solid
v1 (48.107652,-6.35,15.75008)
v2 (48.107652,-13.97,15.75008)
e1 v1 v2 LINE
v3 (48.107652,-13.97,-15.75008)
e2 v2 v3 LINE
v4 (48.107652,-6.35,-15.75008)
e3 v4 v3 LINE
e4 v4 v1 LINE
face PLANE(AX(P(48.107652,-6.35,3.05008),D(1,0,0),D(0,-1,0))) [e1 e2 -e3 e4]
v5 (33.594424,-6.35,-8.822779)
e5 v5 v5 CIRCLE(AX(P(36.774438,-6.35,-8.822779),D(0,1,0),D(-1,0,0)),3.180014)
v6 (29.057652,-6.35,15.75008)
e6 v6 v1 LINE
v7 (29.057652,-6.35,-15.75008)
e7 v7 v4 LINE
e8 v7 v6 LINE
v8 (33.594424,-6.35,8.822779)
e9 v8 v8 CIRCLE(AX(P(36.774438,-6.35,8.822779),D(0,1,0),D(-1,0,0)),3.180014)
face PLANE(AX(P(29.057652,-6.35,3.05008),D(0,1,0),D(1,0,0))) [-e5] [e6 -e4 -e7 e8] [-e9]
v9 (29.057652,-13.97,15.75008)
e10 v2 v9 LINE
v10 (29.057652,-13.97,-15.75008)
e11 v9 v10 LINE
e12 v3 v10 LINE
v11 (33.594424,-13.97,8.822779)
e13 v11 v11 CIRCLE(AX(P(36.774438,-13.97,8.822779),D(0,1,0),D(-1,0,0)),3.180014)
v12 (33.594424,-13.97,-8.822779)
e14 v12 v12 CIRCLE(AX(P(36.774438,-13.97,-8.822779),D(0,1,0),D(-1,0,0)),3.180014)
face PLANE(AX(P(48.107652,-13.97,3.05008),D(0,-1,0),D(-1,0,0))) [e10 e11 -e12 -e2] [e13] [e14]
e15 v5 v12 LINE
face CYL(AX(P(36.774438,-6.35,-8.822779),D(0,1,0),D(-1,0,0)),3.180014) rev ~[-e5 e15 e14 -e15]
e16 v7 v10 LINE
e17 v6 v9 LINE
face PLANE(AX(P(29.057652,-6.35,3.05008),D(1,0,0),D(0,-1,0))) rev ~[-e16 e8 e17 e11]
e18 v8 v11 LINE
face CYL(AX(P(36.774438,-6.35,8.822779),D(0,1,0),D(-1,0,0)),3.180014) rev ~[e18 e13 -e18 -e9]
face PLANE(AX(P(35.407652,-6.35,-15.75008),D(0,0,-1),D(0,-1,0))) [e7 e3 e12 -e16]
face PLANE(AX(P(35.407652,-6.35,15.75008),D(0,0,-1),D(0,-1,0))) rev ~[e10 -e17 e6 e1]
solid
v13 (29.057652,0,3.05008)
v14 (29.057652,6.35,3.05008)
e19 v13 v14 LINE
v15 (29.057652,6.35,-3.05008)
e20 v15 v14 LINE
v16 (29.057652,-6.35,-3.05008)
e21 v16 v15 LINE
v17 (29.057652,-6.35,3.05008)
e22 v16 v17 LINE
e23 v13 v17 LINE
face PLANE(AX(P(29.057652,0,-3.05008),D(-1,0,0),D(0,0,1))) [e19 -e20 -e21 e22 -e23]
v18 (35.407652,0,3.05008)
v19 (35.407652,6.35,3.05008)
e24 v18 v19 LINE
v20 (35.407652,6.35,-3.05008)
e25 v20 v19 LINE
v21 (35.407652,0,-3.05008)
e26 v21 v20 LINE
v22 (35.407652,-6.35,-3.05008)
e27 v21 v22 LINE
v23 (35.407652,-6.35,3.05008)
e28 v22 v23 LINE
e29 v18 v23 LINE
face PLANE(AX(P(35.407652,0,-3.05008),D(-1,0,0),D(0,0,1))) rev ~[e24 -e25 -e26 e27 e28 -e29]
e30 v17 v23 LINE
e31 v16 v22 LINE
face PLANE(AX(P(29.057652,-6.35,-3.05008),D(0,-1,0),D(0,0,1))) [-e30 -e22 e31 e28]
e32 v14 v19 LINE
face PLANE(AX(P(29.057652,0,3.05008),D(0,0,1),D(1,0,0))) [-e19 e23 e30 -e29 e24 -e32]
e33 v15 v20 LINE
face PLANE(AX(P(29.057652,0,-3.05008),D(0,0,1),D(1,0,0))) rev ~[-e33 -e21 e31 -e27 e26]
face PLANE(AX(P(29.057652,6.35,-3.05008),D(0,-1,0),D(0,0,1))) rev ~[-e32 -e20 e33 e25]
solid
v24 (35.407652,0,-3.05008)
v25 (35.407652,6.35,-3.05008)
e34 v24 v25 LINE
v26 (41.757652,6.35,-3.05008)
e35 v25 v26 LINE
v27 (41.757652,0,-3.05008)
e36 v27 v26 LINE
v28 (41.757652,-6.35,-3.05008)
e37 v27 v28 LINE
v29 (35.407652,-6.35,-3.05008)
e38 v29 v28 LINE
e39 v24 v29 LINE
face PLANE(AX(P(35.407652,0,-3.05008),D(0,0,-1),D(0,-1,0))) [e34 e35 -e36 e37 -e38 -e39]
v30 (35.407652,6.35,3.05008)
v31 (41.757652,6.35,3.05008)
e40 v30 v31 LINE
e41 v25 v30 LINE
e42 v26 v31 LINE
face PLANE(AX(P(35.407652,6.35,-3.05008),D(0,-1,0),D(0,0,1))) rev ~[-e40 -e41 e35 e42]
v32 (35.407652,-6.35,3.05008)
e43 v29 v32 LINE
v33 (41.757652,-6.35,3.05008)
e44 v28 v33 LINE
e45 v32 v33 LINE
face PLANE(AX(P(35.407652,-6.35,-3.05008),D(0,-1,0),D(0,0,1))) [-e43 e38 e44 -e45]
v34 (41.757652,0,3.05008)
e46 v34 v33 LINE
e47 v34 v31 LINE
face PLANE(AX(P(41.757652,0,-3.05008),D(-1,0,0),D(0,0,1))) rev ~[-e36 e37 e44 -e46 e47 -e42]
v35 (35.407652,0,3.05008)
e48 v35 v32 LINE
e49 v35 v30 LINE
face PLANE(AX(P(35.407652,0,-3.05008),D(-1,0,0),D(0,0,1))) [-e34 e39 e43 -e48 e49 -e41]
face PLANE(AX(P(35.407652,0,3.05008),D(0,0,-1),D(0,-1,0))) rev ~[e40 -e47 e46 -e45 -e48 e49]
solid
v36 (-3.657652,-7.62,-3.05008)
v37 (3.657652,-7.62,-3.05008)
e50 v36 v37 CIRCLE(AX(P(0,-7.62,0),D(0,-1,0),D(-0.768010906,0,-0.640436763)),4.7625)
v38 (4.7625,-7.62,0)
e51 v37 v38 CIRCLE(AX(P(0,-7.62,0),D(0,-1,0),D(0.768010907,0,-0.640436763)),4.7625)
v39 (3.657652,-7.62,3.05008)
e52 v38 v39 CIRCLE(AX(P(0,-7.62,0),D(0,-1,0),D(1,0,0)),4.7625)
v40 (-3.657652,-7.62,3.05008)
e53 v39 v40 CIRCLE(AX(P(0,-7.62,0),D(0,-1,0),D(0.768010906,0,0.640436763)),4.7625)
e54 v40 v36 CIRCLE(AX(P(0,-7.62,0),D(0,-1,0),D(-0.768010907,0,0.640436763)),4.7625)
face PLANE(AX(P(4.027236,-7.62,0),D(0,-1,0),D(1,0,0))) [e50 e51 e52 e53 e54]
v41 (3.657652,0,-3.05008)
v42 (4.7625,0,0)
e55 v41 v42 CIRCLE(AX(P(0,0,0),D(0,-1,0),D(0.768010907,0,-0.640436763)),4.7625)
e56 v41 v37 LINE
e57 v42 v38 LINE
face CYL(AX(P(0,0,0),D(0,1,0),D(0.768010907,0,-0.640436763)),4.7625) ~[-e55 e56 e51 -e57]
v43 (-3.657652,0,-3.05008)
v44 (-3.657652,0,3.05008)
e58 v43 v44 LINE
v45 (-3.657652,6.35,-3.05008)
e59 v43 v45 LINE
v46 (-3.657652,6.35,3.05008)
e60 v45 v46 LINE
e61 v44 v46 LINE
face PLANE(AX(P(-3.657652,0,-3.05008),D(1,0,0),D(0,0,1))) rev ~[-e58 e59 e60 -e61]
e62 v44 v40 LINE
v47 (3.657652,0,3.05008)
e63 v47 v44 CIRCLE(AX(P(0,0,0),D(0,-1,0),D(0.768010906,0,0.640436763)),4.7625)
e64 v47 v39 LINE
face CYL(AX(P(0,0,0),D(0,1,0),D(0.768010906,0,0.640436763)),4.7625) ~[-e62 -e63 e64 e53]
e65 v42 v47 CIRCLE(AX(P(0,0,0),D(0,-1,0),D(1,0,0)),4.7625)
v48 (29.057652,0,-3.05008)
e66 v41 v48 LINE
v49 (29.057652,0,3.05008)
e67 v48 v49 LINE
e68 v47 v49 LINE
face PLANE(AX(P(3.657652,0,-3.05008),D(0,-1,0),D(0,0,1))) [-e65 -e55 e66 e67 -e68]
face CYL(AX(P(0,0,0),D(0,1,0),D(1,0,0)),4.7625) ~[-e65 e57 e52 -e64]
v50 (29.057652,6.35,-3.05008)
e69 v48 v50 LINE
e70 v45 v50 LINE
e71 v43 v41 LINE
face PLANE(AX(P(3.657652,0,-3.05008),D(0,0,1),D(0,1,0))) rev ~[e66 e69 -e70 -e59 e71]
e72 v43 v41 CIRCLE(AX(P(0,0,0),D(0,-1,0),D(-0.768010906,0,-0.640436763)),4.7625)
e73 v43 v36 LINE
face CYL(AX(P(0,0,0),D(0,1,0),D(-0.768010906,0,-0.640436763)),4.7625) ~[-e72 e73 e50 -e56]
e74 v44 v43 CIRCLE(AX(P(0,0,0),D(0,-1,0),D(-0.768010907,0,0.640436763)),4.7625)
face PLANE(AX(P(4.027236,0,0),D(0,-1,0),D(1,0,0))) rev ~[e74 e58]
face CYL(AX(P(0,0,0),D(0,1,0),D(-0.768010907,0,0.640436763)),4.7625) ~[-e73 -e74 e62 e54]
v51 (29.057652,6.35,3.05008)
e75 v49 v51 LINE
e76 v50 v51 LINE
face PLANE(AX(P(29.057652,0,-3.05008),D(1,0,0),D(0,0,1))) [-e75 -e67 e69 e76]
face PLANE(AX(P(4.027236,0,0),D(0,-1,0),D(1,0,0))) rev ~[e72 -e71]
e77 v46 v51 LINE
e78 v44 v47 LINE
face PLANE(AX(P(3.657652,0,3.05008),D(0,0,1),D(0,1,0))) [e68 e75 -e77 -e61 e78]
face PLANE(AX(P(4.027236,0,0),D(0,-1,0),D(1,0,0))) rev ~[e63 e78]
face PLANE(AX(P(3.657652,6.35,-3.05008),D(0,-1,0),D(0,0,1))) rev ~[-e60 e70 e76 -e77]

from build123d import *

# Parameters (mm, degrees)
F0_W      = 7.3153038846
F0_H      = 6.1001601681
F1_DEPTH  = 7.62
F2_DEPTH  = 6.35
F3_DEPTH  = 25.4
F4_DEPTH  = 6.35
F5_DEPTH  = 6.35
F6_DEPTH  = 7.62
F7_DEPTH  = 12.7
F8_DEPTH  = 12.7
F9_DEPTH  = 12.7
F10_DEPTH = 6.35
F11_R     = 3.1800137538
F12_DEPTH = 25.4


with BuildPart() as f1:
    # F0 (on Front) → F1 (new body)
    with BuildSketch(Plane.XZ):
        with BuildLine():
            ThreePointArc((3.6576519423, -3.0500800841), (4.4777769945, -1.622010924), (4.7625, 0))
            ThreePointArc((4.7625, 0), (4.4777769945, 1.622010924), (3.6576519423, 3.0500800841))
            Line((3.6576519423, 3.0500800841), (3.6576519423, -3.0500800841))
        make_face()
        with BuildLine():
            Line((-3.6576519423, 3.0500800841), (3.6576519423, 3.0500800841))
            ThreePointArc((3.6576519423, 3.0500800841), (0, 4.7625), (-3.6576519423, 3.0500800841))
        make_face()
        Rectangle(F0_W, F0_H)
        with BuildLine():
            ThreePointArc((-3.6576519423, -3.0500800841), (0, -4.7625), (3.6576519423, -3.0500800841))
            Line((3.6576519423, -3.0500800841), (-3.6576519423, -3.0500800841))
        make_face()
        with BuildLine():
            Line((-3.6576519423, -3.0500800841), (-3.6576519423, 3.0500800841))
            ThreePointArc((-3.6576519423, 3.0500800841), (-4.7625, 0), (-3.6576519423, -3.0500800841))
        make_face()
    extrude(amount=F1_DEPTH)

    # F0 (on Front) → F2 (join)
    with BuildSketch(Plane.XZ):
        Rectangle(F0_W, F0_H)
    extrude(amount=-F2_DEPTH)

    # F3 (add): a face of the model
    f3_faces = [f1.faces().sort_by_distance(p)[0] for p in [
        (3.6576519423, 3.175, 0),
    ]]
    extrude(f3_faces, amount=F3_DEPTH)


with BuildPart() as f4:
    # F4 (new): a face of the model
    f4_faces = [f1.part.faces().sort_by_distance(p)[0] for p in [
        (29.0576519423, 3.175, 0),
    ]]
    extrude(f4_faces, amount=F4_DEPTH)

    # F5 (add): a face of the model
    f5_faces = [f4.faces().sort_by_distance(p)[0] for p in [
        (32.2326519423, 0, 0),
    ]]
    extrude(f5_faces, amount=F5_DEPTH)


with BuildPart() as f6:
    # F6 (new): a face of the model
    f6_faces = [f4.part.faces().sort_by_distance(p)[0] for p in [
        (32.2326519423, -6.35, 0),
    ]]
    extrude(f6_faces, amount=F6_DEPTH)

    # F7 (add): a face of the model
    f7_faces = [f6.faces().sort_by_distance(p)[0] for p in [
        (35.4076519423, -10.16, 0),
    ]]
    extrude(f7_faces, amount=F7_DEPTH)

    # F8 (add): a face of the model
    f8_faces = [f6.faces().sort_by_distance(p)[0] for p in [
        (38.5826519423, -10.16, -3.0500800841),
    ]]
    extrude(f8_faces, amount=F8_DEPTH)

    # F9 (add): a face of the model
    f9_faces = [f6.faces().sort_by_distance(p)[0] for p in [
        (38.5826519423, -10.16, 3.0500800841),
    ]]
    extrude(f9_faces, amount=F9_DEPTH)

    # F11 (on face) → F12 (cut)
    with BuildSketch(Plane(origin=(0, -6.35, 0), x_dir=(-1, 0, 0), z_dir=(0, 1, 0))):
        with Locations((-36.7744378746, 8.8227791712)):
            Circle(F11_R)
        with Locations((-36.7744378746, -8.8227791712)):
            Circle(F11_R)
    extrude(amount=-F12_DEPTH, mode=Mode.SUBTRACT)


with BuildPart() as f10:
    # F10 (new): a face of the model
    f10_faces = [f4.part.faces().sort_by_distance(p)[0] for p in [
        (35.4076519423, 0, 0),
    ]]
    extrude(f10_faces, amount=F10_DEPTH)


solid = Compound([f1.part, f4.part, f6.part, f10.part])
